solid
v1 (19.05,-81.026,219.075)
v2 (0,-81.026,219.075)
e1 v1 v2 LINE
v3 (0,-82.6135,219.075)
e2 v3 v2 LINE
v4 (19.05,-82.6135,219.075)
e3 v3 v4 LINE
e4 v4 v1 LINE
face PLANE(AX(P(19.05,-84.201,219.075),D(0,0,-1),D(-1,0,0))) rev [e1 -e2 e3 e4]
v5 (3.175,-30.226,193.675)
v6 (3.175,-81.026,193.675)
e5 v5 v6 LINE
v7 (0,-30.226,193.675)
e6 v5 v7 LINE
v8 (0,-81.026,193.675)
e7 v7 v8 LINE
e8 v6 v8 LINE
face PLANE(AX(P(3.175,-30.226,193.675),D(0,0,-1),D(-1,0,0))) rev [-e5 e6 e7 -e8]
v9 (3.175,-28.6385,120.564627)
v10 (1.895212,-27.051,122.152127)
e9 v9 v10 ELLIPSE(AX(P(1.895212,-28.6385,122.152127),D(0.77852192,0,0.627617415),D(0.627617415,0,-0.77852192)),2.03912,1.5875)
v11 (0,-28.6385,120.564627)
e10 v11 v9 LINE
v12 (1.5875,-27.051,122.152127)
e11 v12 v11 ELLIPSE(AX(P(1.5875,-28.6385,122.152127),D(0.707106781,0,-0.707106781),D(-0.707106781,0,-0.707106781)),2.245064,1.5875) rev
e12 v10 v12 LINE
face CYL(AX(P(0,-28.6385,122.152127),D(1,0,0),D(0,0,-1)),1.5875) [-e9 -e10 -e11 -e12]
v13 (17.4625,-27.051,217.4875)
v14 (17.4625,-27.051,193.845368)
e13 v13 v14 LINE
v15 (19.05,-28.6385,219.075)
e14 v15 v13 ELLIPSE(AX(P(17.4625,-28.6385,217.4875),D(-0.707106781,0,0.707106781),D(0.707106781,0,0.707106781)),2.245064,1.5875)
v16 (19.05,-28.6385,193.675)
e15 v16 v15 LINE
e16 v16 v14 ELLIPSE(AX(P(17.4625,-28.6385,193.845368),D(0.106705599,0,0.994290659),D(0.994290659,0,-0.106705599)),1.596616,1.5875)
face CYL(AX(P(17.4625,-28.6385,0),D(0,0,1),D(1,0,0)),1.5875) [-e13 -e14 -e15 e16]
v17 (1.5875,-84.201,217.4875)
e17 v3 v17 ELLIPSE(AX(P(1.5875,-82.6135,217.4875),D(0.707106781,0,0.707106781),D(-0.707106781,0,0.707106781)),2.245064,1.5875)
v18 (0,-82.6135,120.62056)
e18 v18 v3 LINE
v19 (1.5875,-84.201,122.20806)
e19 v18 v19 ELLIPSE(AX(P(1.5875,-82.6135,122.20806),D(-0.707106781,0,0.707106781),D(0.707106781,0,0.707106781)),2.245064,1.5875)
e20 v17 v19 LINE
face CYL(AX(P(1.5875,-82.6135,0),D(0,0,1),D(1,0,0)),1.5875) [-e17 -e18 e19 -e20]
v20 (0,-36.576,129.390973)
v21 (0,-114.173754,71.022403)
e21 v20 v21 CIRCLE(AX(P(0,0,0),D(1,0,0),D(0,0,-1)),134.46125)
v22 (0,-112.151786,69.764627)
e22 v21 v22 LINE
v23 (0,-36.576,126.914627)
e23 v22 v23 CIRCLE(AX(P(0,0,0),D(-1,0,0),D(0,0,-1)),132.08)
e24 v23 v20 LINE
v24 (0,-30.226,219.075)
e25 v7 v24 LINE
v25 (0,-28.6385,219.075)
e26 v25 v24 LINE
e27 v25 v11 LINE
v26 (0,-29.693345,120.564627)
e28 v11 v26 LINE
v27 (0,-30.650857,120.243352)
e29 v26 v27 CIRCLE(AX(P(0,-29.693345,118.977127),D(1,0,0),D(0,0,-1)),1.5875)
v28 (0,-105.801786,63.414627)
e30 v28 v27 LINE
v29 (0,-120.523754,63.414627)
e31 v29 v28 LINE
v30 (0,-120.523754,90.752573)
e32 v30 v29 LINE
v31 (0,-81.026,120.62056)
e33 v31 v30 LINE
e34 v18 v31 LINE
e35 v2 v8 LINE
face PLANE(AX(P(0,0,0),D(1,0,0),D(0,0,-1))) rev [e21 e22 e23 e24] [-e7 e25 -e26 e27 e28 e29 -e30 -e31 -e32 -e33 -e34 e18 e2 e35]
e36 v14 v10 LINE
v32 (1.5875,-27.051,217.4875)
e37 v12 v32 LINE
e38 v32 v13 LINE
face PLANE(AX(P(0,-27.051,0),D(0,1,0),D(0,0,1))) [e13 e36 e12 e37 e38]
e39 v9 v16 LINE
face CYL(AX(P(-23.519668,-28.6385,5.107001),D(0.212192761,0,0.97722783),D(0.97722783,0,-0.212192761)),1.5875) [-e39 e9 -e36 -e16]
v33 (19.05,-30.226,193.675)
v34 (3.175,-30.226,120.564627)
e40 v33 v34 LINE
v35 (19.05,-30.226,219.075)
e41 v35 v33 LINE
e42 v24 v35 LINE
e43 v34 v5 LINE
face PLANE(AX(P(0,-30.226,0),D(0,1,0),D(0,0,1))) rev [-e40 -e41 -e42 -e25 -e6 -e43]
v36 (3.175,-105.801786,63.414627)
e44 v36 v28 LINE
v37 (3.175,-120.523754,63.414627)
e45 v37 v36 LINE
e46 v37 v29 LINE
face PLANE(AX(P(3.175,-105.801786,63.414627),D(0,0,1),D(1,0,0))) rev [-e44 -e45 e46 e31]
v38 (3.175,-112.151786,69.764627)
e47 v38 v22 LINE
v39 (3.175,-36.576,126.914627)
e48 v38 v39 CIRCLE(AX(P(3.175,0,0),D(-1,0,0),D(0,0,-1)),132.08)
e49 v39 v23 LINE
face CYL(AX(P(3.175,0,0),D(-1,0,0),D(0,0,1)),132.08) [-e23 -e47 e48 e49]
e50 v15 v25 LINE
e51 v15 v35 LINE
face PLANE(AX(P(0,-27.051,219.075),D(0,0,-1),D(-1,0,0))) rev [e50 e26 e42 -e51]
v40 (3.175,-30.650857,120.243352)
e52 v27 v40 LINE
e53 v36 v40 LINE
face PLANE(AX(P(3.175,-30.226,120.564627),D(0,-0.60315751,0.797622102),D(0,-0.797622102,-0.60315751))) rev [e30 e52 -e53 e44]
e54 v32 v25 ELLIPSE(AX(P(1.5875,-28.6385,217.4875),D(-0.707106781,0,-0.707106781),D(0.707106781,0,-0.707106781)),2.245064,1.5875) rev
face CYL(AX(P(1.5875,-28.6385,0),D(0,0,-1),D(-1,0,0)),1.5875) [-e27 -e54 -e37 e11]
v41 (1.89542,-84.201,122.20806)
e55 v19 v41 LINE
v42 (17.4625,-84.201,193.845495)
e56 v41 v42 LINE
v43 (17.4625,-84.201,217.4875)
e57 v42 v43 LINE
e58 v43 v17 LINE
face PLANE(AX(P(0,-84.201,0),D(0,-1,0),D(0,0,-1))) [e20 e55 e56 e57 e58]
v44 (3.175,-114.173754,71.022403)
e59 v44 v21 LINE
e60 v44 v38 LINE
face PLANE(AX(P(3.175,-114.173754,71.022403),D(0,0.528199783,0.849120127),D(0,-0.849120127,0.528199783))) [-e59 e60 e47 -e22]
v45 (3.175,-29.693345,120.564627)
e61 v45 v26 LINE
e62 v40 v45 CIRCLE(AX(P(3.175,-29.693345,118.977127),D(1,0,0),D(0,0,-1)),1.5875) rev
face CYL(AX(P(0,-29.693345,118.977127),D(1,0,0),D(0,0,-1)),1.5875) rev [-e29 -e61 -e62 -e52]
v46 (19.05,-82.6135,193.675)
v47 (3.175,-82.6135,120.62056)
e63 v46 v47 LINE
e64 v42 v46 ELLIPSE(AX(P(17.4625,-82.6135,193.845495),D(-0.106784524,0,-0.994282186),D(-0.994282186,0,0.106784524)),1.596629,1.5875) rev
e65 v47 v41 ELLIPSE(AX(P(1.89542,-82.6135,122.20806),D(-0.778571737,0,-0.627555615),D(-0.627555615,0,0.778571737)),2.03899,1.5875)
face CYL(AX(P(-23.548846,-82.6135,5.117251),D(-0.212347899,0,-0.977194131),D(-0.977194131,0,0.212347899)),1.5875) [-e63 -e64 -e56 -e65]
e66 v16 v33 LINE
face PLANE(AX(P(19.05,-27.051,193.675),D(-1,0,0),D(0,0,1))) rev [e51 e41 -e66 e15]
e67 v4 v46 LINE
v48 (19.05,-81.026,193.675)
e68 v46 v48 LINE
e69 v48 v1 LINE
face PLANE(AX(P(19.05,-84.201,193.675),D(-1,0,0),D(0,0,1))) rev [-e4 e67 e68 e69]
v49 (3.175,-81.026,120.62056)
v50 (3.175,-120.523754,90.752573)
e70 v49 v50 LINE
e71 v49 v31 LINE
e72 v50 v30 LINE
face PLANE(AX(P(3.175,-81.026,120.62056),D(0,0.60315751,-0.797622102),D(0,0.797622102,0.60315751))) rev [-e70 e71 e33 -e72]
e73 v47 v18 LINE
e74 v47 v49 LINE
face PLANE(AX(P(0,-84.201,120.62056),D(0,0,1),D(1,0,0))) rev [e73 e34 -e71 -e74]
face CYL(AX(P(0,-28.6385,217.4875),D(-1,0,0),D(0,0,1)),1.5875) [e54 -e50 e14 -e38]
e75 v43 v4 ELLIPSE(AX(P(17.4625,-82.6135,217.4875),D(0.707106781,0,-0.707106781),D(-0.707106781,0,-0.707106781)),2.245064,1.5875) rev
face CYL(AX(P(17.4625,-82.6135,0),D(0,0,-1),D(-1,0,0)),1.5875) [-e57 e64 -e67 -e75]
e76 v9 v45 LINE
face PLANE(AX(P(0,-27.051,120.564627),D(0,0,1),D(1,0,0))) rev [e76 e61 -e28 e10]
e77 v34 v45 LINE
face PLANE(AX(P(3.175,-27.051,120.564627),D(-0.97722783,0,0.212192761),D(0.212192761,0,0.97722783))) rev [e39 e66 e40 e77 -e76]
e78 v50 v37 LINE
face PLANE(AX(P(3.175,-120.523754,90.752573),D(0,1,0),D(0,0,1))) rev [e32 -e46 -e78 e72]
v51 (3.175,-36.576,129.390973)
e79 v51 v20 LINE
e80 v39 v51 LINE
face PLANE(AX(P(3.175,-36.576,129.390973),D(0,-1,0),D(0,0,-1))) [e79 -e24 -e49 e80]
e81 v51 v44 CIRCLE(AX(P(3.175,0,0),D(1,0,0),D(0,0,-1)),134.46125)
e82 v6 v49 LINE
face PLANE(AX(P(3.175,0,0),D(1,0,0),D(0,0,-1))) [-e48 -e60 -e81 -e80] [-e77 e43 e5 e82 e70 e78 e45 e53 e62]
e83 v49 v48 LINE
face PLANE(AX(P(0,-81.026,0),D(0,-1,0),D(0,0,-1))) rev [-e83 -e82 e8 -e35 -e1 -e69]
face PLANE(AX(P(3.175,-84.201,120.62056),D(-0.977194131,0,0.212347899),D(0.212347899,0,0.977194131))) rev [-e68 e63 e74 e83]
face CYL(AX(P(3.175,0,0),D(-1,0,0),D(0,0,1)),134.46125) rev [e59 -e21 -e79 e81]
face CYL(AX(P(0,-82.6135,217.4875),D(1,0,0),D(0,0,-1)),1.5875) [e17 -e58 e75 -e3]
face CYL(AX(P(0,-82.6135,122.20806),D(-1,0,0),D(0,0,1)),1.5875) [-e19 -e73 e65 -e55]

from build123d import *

# Parameters (mm, degrees)
BOSS_EXTRUDE1_DEPTH = 3.175
BOSS_EXTRUDE2_DEPTH = 3.175
FILLET1_R           = 1.5875
BOSS_EXTRUDE3_DEPTH = 3.175
FILLET2_R           = 1.5875


with BuildPart() as part:
    # Sketch1 → Boss-Extrude1 (new body)
    with BuildSketch(Plane(origin=(0, 0, 0), x_dir=(0, 0, -1), z_dir=(1, 0, 0))):
        Polygon((-120.564627305, -30.226), (-63.414627305, -105.80178633), (-63.414627305, -120.523753631), (-90.752572968, -120.523753631), (-120.620560185, -81.026), (-193.675, -81.026), (-193.675, -30.226), align=None)
        with BuildLine():
            Line((-129.390973316, -36.576), (-126.914627305, -36.576))
            ThreePointArc((-126.914627305, -36.576), (-105.349927235, -79.665043976), (-69.764627305, -112.15178633))
            Line((-69.764627305, -112.15178633), (-71.022403038, -114.173753631))
            ThreePointArc((-71.022403038, -114.173753631), (-107.455726685, -80.827560609), (-129.390973316, -36.576))
        make_face(mode=Mode.SUBTRACT)
    extrude(amount=BOSS_EXTRUDE1_DEPTH)

    # Sketch2 → Boss-Extrude2 (add)
    with BuildSketch(Plane(origin=(0, -30.226, 0), x_dir=(1, 0, 0), z_dir=(0, 1, 0))):
        Polygon((0, -120.564627305), (3.175, -120.564627305), (19.05, -193.675), (19.05, -219.075), (0, -219.075), align=None)
    extrude(amount=BOSS_EXTRUDE2_DEPTH)

    # Fillet1
    # the kernel refuses this fillet: 1.5875 mm, written as the material it adds along each edge
    with BuildSketch(Plane(origin=(0, -30.226, 120.564627305), x_dir=(0, -0.7976221020191943, -0.6031575104153825), z_dir=(1, 0, 0))) as fillet1_piece_1:
        with BuildLine():
            CenterArc((FILLET1_R * 0.335530760185, FILLET1_R), FILLET1_R, 232.903626037, 37.096373963)
            Line((-FILLET1_R * 0.267626750231, FILLET1_R * 0.202377897981), (0, 0))
            Line((0, 0), (FILLET1_R * 0.335530760185, 0))
        make_face()
    extrude(amount=3.175)
    # the kernel refuses this fillet: 1.5875 mm, written as the material it takes off along each edge
    with BuildSketch(Plane(origin=(0, -27.051, 223.04375), x_dir=(0, -1, 0), z_dir=(0, 0, -1))) as fillet1_2_piece_1:
        with BuildLine():
            CenterArc((FILLET1_R, -FILLET1_R), FILLET1_R, 90, 90)
            Line((0, -FILLET1_R), (0, 0))
            Line((0, 0), (FILLET1_R, 0))
        make_face()
    extrude(amount=106.447872695, mode=Mode.SUBTRACT)
    with BuildSketch(Plane(origin=(23.01875, -27.051, 219.075), x_dir=(0, -1, 0), z_dir=(-1, 0, 0))) as fillet1_2_piece_2:
        with BuildLine():
            CenterArc((FILLET1_R, -FILLET1_R), FILLET1_R, 90, 90)
            Line((0, -FILLET1_R), (0, 0))
            Line((0, 0), (FILLET1_R, 0))
        make_face()
    extrude(amount=26.9875, mode=Mode.SUBTRACT)
    with BuildSketch(Plane(origin=(19.05, -27.051, 189.70625), x_dir=(-1, 0, 0), z_dir=(0, 0, 1))) as fillet1_2_piece_3:
        with BuildLine():
            CenterArc((FILLET1_R, FILLET1_R), FILLET1_R, 180, 90)
            Line((0, FILLET1_R), (0, 0))
            Line((0, 0), (FILLET1_R, 0))
        make_face()
    extrude(amount=33.3375, mode=Mode.SUBTRACT)
    with BuildSketch(Plane(origin=(2.332859982, -27.051, 116.686254354), x_dir=(-0.9772278303307078, 0, 0.21219276054365557), z_dir=(0.21219276054365557, 0, 0.9772278303307079))) as fillet1_2_piece_4:
        with BuildLine():
            CenterArc((FILLET1_R, FILLET1_R), FILLET1_R, 180, 90)
            Line((0, FILLET1_R), (0, 0))
            Line((0, 0), (FILLET1_R, 0))
        make_face()
    extrude(amount=82.751550957, mode=Mode.SUBTRACT)
    with BuildSketch(Plane(origin=(-3.96875, -27.051, 120.564627305), x_dir=(0, 0, 1), z_dir=(1, 0, 0))) as fillet1_2_piece_5:
        with BuildLine():
            CenterArc((FILLET1_R, FILLET1_R), FILLET1_R, 180, 90)
            Line((0, FILLET1_R), (0, 0))
            Line((0, 0), (FILLET1_R, 0))
        make_face()
    extrude(amount=11.1125, mode=Mode.SUBTRACT)

    # Sketch4 → Boss-Extrude3 (add)
    with BuildSketch(Plane.XZ.offset(81.026)):
        Polygon((0, 120.620560185), (3.175, 120.620560185), (19.05, 193.675), (19.05, 219.075), (0, 219.075), align=None)
    extrude(amount=BOSS_EXTRUDE3_DEPTH)

    # Fillet2
    fillet2_edges = [part.edges().sort_by_distance(p)[0] for p in [
        (0, -84.201, 169.847780093),
        (1.5875, -84.201, 120.620560185),
        (11.1125, -84.201, 157.147780093),
        (19.05, -84.201, 206.375),
        (9.525, -84.201, 219.075),
    ]]
    fillet(fillet2_edges, radius=FILLET2_R)


solid = part.part
